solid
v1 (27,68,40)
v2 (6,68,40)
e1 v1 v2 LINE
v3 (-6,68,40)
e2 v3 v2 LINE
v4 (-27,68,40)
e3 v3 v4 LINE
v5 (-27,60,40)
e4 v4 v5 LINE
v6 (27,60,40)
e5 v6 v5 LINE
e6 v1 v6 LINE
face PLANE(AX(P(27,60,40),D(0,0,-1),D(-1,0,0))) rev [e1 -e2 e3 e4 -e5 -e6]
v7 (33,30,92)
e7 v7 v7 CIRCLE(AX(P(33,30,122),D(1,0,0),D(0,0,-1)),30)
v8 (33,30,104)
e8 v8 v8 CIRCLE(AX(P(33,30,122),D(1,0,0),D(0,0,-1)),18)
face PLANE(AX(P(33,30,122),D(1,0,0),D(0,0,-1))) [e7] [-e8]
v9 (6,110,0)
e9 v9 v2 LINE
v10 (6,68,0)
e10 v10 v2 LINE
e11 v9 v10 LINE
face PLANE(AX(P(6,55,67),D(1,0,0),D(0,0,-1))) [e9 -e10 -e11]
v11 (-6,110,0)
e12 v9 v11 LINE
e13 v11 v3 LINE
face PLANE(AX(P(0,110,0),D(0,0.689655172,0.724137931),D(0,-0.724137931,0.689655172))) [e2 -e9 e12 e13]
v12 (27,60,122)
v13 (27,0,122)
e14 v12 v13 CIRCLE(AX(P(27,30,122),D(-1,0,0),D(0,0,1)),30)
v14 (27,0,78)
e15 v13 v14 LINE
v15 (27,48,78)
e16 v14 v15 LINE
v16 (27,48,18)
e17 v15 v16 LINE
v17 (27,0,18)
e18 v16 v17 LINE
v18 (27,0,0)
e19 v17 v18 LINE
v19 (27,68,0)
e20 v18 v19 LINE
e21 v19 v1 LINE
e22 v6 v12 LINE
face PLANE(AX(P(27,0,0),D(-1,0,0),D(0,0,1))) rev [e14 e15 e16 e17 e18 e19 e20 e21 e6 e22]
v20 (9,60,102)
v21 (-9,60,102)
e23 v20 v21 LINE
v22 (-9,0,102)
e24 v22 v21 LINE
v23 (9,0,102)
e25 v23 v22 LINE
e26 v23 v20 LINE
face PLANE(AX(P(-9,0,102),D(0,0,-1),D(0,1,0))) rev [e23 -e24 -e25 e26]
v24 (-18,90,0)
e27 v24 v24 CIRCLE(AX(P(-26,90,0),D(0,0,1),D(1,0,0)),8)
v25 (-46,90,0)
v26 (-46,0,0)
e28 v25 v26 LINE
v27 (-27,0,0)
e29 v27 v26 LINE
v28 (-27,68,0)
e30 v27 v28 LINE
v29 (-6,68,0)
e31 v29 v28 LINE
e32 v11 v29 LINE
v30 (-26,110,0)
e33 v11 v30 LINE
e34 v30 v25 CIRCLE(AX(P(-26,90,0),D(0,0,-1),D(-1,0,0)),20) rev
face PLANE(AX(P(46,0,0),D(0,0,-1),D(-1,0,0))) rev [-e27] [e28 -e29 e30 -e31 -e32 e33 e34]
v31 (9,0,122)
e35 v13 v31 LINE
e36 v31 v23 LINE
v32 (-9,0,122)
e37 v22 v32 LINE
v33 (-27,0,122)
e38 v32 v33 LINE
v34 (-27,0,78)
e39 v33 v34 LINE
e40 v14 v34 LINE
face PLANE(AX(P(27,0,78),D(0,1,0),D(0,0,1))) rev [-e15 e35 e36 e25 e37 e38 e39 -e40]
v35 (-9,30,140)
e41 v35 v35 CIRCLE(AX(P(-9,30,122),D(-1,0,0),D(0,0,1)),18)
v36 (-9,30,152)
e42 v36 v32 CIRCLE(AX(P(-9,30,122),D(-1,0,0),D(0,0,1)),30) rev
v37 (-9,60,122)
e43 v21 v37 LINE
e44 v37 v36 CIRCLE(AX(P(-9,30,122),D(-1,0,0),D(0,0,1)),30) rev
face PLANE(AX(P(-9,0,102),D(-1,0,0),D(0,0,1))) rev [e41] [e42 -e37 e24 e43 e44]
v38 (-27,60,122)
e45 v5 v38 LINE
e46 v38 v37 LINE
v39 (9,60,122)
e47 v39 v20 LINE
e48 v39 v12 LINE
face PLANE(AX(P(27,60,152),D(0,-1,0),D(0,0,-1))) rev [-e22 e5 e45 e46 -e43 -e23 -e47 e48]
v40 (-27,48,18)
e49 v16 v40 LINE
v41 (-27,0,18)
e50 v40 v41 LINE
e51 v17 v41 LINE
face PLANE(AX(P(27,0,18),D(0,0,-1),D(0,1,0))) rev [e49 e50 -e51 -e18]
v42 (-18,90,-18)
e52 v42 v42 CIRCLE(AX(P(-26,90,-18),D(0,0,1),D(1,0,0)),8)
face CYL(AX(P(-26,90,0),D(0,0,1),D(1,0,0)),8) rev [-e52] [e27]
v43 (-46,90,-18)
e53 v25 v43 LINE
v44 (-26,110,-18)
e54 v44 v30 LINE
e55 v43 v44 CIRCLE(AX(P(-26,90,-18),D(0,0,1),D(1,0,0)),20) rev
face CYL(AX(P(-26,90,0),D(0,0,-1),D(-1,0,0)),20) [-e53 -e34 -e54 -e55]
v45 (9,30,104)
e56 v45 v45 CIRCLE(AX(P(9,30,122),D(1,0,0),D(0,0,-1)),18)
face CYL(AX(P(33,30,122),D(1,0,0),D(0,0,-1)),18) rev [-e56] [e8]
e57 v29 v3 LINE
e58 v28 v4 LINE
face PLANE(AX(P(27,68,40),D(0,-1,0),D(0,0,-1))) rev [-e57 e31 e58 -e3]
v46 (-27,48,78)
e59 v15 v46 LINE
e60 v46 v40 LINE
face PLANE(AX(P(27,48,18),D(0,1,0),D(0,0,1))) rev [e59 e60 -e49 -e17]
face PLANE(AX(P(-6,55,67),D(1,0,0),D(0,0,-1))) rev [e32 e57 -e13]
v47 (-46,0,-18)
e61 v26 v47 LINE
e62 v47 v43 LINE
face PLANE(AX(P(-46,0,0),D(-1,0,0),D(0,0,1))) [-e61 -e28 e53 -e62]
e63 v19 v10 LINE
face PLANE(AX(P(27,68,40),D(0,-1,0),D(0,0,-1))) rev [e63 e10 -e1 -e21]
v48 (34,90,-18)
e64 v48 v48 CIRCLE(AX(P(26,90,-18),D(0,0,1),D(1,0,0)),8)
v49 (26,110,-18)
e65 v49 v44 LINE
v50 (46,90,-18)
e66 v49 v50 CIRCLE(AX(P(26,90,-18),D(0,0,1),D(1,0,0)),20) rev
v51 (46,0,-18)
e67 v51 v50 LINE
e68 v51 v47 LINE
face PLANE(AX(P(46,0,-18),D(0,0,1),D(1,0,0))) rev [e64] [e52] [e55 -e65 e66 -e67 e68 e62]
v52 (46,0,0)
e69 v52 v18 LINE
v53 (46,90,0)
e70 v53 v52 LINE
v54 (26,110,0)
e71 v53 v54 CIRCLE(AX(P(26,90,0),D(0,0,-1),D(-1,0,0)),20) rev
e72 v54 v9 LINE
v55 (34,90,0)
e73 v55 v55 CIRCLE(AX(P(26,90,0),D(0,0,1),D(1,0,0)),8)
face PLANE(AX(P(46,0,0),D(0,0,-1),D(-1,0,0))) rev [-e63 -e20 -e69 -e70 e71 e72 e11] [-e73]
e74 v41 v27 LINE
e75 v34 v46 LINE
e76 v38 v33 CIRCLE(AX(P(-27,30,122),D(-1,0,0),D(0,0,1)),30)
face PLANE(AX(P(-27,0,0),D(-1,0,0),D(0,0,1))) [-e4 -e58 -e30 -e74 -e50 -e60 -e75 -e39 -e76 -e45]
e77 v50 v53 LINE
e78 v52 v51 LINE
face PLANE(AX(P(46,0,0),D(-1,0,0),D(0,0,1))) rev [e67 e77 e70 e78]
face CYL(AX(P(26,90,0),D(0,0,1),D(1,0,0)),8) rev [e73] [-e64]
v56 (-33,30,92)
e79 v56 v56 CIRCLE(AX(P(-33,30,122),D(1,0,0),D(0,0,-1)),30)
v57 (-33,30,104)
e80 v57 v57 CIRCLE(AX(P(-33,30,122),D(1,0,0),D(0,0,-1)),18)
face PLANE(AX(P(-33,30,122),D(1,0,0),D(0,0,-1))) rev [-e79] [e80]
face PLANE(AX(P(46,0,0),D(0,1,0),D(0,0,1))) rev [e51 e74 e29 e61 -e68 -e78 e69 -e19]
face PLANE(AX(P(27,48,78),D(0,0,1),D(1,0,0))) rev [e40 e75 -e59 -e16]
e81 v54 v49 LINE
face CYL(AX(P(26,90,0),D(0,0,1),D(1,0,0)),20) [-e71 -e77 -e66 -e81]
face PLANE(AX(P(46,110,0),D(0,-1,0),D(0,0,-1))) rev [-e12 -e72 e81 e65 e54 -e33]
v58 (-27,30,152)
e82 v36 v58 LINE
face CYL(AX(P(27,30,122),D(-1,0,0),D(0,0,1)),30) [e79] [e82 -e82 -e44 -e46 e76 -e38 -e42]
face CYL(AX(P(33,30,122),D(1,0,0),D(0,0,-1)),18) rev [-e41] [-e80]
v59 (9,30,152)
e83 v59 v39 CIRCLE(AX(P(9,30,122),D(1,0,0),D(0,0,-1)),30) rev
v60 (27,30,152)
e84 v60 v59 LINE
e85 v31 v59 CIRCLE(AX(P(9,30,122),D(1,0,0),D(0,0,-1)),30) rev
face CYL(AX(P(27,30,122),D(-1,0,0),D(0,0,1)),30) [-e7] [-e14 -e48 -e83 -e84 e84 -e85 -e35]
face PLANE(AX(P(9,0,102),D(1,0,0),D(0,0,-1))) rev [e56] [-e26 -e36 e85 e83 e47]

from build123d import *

# Parameters (mm, degrees)
SKETCH1_W                = 18
SKETCH1_H                = 110
BOSS_EXTRUDE1_DEPTH      = 46
BOSS_EXTRUDE2_DEPTH      = 27
FILLET1_R                = 30
BOSS_EXTRUDE3_DEPTH      = 6
BOSS_EXTRUDE3_DEPTH_BACK = 60
SKETCH3_R                = 30
FILLET3_R                = 20
SKETCH4_W                = 18
SKETCH4_H                = 50
CUT_EXTRUDE1_DEPTH       = 170.764542823
HOLE1_D                  = 36
HOLE2_D                  = 16
RIB1_REACH               = 195.184
SKETCH9_WALL_W           = 446.367700514
SKETCH9_WALL_H           = 12


with BuildPart() as part:
    # Sketch1 → Boss-Extrude1 (new, symmetric)
    with BuildSketch(Plane(origin=(0, 0, 0), x_dir=(0, 0, -1), z_dir=(1, 0, 0))):
        with Locations((9, 55)):
            Rectangle(SKETCH1_W, SKETCH1_H)
    extrude(amount=BOSS_EXTRUDE1_DEPTH, both=True)

    # Sketch2 → Boss-Extrude2 (add, symmetric)
    with BuildSketch(Plane(origin=(0, 0, 0), x_dir=(0, 0, -1), z_dir=(1, 0, 0))):
        Polygon((0, 0), (-18, 0), (-18, 48), (-78, 48), (-78, 0), (-152, 0), (-152, 60), (-40, 60), (-40, 68), (0, 68), align=None)
    extrude(amount=BOSS_EXTRUDE2_DEPTH, both=True)

    # Fillet1
    fillet1_edges = [part.edges().sort_by_distance(p)[0] for p in [
        (0, 0, 152),
        (0, 60, 152),
    ]]
    fillet(fillet1_edges, radius=FILLET1_R - 0.0001)  # a hair under: the kernel refuses the full size

    # Sketch3 → Boss-Extrude3 (add, two sides: drawn at the far end of the back side and taken through both)
    with BuildSketch(Plane(origin=(27, 0, 0), x_dir=(0, 0, -1), z_dir=(1, 0, 0)).offset(-BOSS_EXTRUDE3_DEPTH_BACK)):
        with Locations((-122, 30)):
            Circle(SKETCH3_R)
    extrude(amount=BOSS_EXTRUDE3_DEPTH + BOSS_EXTRUDE3_DEPTH_BACK)

    # Fillet3
    fillet3_edges = [part.edges().sort_by_distance(p)[0] for p in [
        (46, 110, -9),
        (-46, 110, -9),
    ]]
    fillet(fillet3_edges, radius=FILLET3_R)

    # Sketch4 → Cut-Extrude1 (cut, through all)
    with BuildSketch(Plane(origin=(0, 60, 0), x_dir=(1, 0, 0), z_dir=(0, 1, 0))):
        with Locations((0, -127)):
            Rectangle(SKETCH4_W, SKETCH4_H)
    extrude(amount=-CUT_EXTRUDE1_DEPTH, mode=Mode.SUBTRACT)

    # Hole1 (through all)
    with Locations(Plane(origin=(33, 0, 0), x_dir=(0, 0, -1), z_dir=(1, 0, 0))):
        with Locations((-122, 30)):
            Hole(HOLE1_D / 2)

    # Hole2 (through all)
    with Locations(Plane.XY):
        with Locations((26, 90), (-26, 90)):
            Hole(HOLE2_D / 2)

    # Sketch9 wall → Rib1 (add, up to next)
    with BuildSketch(Plane(origin=(0, 89, 20), x_dir=(0, -0.724137931034, 0.689655172414), z_dir=(0, -0.689655172414, -0.724137931034)), mode=Mode.PRIVATE) as rib1_sk1:
        Rectangle(SKETCH9_WALL_W, SKETCH9_WALL_H)
    rib1_tool1 = extrude(rib1_sk1.sketch, amount=RIB1_REACH, mode=Mode.PRIVATE) - part.part
    add(rib1_tool1.solids().sort_by_distance((0, 89, 20))[0])


solid = part.part
